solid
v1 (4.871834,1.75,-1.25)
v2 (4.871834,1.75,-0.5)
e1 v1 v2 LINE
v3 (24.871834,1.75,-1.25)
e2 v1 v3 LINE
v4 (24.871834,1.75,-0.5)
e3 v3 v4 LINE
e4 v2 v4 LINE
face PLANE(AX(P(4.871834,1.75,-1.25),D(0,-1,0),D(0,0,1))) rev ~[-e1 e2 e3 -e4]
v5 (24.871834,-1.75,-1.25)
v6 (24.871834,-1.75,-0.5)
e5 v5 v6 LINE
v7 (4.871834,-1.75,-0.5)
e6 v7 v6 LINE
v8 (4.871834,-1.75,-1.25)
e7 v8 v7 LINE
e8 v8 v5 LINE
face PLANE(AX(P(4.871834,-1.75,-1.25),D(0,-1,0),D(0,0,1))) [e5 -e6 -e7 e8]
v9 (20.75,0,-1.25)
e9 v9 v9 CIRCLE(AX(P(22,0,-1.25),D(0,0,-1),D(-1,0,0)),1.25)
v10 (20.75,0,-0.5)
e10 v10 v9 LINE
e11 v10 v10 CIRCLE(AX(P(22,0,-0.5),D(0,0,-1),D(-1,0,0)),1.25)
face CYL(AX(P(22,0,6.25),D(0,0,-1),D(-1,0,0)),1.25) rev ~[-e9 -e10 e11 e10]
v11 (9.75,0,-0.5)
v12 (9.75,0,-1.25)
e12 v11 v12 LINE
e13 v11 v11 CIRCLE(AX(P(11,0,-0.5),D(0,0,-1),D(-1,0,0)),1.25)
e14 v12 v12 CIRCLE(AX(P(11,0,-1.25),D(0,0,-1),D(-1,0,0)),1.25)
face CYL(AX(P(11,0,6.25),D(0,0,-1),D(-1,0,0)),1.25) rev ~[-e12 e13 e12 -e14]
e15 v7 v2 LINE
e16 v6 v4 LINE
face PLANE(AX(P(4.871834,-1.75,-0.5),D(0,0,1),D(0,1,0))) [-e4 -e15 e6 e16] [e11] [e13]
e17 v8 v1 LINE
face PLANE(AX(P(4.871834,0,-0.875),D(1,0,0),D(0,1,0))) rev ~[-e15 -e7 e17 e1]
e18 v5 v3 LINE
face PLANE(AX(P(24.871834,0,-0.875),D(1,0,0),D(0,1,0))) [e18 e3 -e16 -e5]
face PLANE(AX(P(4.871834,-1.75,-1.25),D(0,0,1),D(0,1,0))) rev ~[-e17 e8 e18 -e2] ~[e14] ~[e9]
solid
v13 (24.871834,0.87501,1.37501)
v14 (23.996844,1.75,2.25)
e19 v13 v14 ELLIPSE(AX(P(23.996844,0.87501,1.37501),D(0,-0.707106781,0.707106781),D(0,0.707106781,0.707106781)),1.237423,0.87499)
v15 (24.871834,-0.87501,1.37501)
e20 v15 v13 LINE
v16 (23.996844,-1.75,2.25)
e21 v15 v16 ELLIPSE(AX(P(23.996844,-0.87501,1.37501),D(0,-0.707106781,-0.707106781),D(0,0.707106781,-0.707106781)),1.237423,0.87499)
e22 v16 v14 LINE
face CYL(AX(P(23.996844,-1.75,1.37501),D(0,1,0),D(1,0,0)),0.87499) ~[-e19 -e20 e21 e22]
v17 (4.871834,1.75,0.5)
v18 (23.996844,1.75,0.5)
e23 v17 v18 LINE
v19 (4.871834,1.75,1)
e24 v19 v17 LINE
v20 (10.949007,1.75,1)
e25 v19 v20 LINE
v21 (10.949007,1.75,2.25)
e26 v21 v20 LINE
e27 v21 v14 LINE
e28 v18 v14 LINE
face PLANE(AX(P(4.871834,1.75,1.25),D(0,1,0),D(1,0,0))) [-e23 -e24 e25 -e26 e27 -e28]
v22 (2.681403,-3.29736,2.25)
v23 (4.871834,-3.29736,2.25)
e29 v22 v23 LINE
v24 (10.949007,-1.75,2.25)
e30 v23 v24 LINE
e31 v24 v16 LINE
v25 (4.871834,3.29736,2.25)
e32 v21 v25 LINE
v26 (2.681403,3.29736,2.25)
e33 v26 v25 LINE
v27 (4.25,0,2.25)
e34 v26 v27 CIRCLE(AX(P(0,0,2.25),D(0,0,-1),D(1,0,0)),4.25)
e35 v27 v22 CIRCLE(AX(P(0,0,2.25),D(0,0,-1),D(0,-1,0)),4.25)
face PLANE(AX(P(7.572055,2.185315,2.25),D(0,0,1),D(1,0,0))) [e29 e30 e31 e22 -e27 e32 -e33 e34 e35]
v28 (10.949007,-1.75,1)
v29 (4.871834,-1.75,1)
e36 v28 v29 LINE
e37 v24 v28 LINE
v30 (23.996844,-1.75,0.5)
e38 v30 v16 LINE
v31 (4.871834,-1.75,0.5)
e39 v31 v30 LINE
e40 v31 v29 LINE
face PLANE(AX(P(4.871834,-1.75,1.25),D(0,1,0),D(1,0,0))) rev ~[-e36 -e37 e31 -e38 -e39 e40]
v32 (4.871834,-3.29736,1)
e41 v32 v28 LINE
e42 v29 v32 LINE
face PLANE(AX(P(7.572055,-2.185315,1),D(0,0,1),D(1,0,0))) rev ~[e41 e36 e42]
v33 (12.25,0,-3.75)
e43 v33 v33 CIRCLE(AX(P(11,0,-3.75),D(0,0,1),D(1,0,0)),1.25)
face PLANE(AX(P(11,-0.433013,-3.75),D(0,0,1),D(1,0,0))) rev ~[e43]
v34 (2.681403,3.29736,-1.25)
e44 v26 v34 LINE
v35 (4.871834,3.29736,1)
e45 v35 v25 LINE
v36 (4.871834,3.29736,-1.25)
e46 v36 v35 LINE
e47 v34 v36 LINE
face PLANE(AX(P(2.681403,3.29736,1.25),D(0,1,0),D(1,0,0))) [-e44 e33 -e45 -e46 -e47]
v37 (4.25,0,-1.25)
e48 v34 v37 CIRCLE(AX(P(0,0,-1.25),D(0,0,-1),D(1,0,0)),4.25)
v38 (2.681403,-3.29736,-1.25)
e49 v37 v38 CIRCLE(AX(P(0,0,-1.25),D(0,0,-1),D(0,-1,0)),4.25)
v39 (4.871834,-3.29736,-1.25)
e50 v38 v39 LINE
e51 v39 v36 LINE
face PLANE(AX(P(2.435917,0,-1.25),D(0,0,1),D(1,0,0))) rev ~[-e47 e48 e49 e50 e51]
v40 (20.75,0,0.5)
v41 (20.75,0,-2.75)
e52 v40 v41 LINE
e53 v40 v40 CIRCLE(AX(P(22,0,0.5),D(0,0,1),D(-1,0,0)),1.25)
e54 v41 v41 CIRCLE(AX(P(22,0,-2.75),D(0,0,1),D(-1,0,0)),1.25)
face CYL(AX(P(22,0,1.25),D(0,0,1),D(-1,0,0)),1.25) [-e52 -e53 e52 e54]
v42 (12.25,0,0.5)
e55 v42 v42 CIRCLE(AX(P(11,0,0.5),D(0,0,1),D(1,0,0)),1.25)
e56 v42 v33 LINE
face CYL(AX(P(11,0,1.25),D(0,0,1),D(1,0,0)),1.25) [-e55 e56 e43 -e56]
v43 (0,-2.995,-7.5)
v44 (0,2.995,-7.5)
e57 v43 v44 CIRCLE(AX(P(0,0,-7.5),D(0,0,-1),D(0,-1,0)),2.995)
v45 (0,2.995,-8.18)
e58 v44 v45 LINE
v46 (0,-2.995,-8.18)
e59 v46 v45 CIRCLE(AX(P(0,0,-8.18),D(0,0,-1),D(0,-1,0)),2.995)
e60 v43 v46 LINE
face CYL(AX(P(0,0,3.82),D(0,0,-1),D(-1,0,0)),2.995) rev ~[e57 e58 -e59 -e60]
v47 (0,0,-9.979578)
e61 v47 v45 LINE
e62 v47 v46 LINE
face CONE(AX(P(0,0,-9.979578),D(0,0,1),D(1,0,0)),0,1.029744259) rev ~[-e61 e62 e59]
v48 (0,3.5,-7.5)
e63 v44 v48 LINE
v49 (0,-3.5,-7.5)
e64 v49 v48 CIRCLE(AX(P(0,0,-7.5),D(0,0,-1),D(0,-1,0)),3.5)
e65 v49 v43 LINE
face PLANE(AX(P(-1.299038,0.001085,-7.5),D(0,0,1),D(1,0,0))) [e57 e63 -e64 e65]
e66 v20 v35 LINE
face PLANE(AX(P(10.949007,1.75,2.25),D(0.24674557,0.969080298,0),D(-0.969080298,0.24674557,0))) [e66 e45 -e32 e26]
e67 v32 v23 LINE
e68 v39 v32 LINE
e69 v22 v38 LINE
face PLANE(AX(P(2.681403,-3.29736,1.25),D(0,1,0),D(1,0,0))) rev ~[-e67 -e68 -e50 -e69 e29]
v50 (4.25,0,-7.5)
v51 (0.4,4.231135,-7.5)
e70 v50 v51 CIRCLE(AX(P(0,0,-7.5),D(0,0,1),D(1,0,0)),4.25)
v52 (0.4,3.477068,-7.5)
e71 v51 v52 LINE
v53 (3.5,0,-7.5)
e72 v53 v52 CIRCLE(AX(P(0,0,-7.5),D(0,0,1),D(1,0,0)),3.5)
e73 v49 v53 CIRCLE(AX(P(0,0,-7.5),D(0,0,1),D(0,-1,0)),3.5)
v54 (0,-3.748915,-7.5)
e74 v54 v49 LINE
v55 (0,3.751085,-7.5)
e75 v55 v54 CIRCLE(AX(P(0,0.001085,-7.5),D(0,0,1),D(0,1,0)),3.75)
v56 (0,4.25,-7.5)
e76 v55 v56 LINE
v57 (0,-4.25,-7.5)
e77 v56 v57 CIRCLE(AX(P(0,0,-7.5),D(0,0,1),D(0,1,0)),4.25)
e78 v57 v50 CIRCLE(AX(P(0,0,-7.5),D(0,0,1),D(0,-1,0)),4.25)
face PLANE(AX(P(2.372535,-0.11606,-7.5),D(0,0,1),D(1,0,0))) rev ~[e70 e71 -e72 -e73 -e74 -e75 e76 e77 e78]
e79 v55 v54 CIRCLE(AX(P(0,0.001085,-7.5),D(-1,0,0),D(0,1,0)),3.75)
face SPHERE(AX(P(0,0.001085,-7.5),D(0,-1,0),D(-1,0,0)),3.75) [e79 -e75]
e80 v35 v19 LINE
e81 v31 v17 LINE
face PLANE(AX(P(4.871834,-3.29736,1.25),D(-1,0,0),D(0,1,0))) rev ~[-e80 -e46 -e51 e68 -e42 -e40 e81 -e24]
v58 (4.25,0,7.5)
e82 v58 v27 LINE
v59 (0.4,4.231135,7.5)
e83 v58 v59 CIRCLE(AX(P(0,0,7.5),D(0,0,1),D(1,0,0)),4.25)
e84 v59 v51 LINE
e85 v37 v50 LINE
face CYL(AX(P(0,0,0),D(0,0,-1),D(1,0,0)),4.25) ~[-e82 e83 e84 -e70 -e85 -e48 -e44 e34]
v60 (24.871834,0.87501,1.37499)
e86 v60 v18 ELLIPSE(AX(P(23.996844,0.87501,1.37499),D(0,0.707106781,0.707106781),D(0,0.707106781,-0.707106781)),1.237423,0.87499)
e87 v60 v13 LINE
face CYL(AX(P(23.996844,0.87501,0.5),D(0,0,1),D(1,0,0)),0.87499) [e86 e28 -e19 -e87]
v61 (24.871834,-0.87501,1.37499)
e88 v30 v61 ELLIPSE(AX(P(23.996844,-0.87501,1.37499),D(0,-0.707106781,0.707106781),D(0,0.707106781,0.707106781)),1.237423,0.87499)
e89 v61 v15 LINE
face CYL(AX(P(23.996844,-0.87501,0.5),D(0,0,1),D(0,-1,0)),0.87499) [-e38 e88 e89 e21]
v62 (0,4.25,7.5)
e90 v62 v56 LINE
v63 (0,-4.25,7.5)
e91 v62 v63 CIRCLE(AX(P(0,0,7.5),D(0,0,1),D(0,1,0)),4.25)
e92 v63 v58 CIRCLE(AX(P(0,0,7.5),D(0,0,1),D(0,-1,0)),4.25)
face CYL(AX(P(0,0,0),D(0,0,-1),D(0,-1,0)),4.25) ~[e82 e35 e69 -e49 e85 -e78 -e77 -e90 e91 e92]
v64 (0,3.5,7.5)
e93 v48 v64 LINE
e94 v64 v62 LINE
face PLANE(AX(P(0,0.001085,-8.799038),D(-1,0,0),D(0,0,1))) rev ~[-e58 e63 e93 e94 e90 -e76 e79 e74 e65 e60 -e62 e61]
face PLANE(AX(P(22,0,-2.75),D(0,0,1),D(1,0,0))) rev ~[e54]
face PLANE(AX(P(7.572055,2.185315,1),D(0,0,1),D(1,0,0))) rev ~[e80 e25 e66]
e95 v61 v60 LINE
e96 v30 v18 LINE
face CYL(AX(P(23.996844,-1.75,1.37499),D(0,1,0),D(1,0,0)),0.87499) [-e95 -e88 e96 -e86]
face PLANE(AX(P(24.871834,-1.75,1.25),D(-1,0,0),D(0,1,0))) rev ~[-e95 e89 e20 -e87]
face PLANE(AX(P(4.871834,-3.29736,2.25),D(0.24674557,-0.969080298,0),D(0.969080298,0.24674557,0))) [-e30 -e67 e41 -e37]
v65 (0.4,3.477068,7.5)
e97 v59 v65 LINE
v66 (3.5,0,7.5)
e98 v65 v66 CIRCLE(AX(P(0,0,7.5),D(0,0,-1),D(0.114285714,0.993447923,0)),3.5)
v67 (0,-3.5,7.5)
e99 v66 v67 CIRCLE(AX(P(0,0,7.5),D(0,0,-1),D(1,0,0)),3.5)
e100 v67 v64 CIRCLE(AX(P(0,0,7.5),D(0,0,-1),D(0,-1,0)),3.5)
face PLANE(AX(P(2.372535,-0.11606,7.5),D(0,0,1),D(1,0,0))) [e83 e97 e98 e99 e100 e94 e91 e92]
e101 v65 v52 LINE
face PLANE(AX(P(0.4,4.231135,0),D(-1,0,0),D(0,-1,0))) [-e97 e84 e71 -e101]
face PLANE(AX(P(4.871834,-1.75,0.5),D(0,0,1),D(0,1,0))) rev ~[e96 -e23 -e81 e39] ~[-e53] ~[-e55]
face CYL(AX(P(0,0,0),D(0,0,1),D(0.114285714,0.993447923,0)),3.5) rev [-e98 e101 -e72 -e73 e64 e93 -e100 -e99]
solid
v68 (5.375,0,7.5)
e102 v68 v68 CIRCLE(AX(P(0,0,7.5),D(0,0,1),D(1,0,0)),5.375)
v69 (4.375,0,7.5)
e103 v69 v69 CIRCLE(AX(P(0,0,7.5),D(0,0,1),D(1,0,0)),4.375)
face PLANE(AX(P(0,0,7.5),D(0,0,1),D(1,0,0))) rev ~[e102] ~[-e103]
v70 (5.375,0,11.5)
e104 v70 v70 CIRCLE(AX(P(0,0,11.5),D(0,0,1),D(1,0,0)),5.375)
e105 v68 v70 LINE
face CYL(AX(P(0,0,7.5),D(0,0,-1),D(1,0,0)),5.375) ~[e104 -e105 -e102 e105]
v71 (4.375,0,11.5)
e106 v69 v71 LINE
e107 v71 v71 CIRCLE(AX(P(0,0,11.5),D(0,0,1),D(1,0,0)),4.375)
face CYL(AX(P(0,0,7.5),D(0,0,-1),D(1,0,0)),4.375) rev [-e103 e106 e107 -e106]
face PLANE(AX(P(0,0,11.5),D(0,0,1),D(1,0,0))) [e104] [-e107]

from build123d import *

# Parameters (mm, degrees)
F1_DEPTH  = 7.5
F4_W      = 4.8718336038
F4_H      = 6.594719131
F5_DEPTH  = 1.25
F9_W      = 3.5
F9_H      = 0.75
F10_DEPTH = 20
F14_DEPTH = 20
F15_D     = 2.5
F15_DEPTH = 5
F15_TIP   = 0.7510757738
F16_DEPTH = 5
F17_DEPTH = 1
F18_DEPTH = 4
F20_DEPTH = 1.25
F21_DEPTH = 25
F22_R     = 5.375
F22_R_2   = 4.375
F23_DEPTH = 4
F24_R     = 0.87499
F25_ANGLE = 90
F26_D     = 5.99
F26_DEPTH = 6
F26_TIP   = 1.799577554


# Not quite as in the source:
# - a fillet or chamfer is up to 0.001 mm smaller than in the source, because OpenCascade refuses the exact size
# - a feature names something its author has since deleted; it is built from what else it names


with BuildPart() as f1:
    # F0 (on Top) → F1 (new body, symmetric)
    with BuildSketch(Plane.XY):
        with BuildLine():
            ThreePointArc((0.4, 3.4770677301), (2.6124700955, 2.3291629398), (3.5, 0))
            ThreePointArc((3.5, 0), (2.4748737342, -2.4748737342), (0, -3.5))
            Line((0, -3.5), (0, -4.25))
            ThreePointArc((0, -4.25), (3.00520382, -3.00520382), (4.25, 0))
            ThreePointArc((4.25, 0), (3.1434455618, 2.860288447), (0.4, 4.2311345996))
            Line((0.4, 4.2311345996), (0.4, 3.4770677301))
        make_face()
        with BuildLine():
            Line((0, -4.25), (0, -3.5))
            ThreePointArc((0, -3.5), (-3.5, 0), (0, 3.5))
            Line((0, 3.5), (0, 4.25))
            ThreePointArc((0, 4.25), (-4.25, 0), (0, -4.25))
        make_face()
    extrude(amount=F1_DEPTH, both=True)

    # F4 (on Top) → F5 (join, symmetric)
    with BuildSketch(Plane.XY):
        with Locations((2.4359168019, 0)):
            Rectangle(F4_W, F4_H)
    extrude(amount=F5_DEPTH, both=True)

    # F9 (on offset) → F10 (join)
    with BuildSketch(Plane.YZ.offset(4.8718336038)):
        with Locations((0, 0.875)):
            Rectangle(F9_W, F9_H)
    extrude(amount=F10_DEPTH)

    # F12 (on offset) → F16 (join)
    with BuildSketch(Plane.XY.offset(1.25)):
        with BuildLine():
            Line((12.25, 0), (11, 0))
            Line((11, 0), (9.75, 0))
            ThreePointArc((9.75, 0), (11, -1.25), (12.25, 0))
        make_face()
        with BuildLine():
            Line((9.75, 0), (11, 0))
            Line((11, 0), (12.25, 0))
            ThreePointArc((12.25, 0), (11, 1.25), (9.75, 0))
        make_face()
    extrude(amount=-F16_DEPTH)

    # F17 (add): a face of the model
    f17_faces = [f1.faces().sort_by_distance(p)[0] for p in [
        (13.8735829145, 0, 1.25),
    ]]
    extrude(f17_faces, amount=F17_DEPTH)

    # F12 (on offset) → F18 (join)
    with BuildSketch(Plane.XY.offset(1.25)):
        with BuildLine():
            ThreePointArc((23.25, 0), (22, 1.25), (20.75, 0))
            ThreePointArc((20.75, 0), (22, -1.25), (23.25, 0))
        make_face()
    extrude(amount=-F18_DEPTH)

    # F19 (on face) → F20 (join)
    with BuildSketch(Plane.XY.offset(2.25)):
        Polygon((10.9490072355, 1.75), (4.8718336038, 3.2973595655), (4.8718336038, 1.75), align=None)
        Polygon((4.8718336038, -1.75), (4.8718336038, -3.2973595655), (10.9490072355, -1.75), align=None)
    extrude(amount=-F20_DEPTH)

    # F21 (cut): a face of the model
    f21_faces = [f1.faces().sort_by_distance(p)[0] for p in [
        (1.5030375026, 0, 1.25),
    ]]
    extrude(f21_faces, amount=-F21_DEPTH, mode=Mode.SUBTRACT)

    # F24 (radius 0.875 in the source; OpenCascade refuses exactly that, so slightly less here)
    f24_edges = [f1.edges().sort_by_distance(p)[0] for p in [
        (24.871834, 0, 2.25),
        (24.871834, -1.75, 1.375),
        (24.871834, 0, 0.5),
        (24.871834, 1.75, 1.375),
    ]]
    fillet(f24_edges, radius=F24_R)

    # F3 (on offset) → F25 (revolve)
    with BuildSketch(Plane.XY.offset(-7.5)):
        with BuildLine():
            Line((0, -3.7489147878), (0, 3.7510852122))
            ThreePointArc((0, 3.7510852122), (-3.75, 0.0010852122), (0, -3.7489147878))
        make_face()
    revolve(axis=Axis((0, 0.0010852122, -7.5), (0, -1, 0)), revolution_arc=F25_ANGLE)

    # F26
    with Locations(Plane.XY.offset(-2.18)):
        with Locations((0, 0)):
            Hole(F26_D / 2, depth=F26_DEPTH)
            with Locations((0, 0, -(F26_DEPTH + F26_TIP / 2))):  # 118° drill point
                Cone(0, F26_D / 2, F26_TIP, mode=Mode.SUBTRACT)


with BuildPart() as f14:
    # F9 (on offset) → F14 (new body)
    with BuildSketch(Plane.YZ.offset(4.8718336038)):
        with Locations((0, -0.875)):
            Rectangle(F9_W, F9_H)
    extrude(amount=F14_DEPTH)

    # F15
    with Locations(Plane.XY.offset(1.25)):
        with Locations((11, 0), (22, 0)):
            Hole(F15_D / 2, depth=F15_DEPTH)
            with Locations((0, 0, -(F15_DEPTH + F15_TIP / 2))):  # 118° drill point
                Cone(0, F15_D / 2, F15_TIP, mode=Mode.SUBTRACT)


with BuildPart() as f23:
    # F22 (on face) → F23 (new body)
    with BuildSketch(Plane.XY.offset(7.5)):
        Circle(F22_R)
        Circle(F22_R_2, mode=Mode.SUBTRACT)
    extrude(amount=F23_DEPTH)


solid = Compound([f1.part, f14.part, f23.part])
